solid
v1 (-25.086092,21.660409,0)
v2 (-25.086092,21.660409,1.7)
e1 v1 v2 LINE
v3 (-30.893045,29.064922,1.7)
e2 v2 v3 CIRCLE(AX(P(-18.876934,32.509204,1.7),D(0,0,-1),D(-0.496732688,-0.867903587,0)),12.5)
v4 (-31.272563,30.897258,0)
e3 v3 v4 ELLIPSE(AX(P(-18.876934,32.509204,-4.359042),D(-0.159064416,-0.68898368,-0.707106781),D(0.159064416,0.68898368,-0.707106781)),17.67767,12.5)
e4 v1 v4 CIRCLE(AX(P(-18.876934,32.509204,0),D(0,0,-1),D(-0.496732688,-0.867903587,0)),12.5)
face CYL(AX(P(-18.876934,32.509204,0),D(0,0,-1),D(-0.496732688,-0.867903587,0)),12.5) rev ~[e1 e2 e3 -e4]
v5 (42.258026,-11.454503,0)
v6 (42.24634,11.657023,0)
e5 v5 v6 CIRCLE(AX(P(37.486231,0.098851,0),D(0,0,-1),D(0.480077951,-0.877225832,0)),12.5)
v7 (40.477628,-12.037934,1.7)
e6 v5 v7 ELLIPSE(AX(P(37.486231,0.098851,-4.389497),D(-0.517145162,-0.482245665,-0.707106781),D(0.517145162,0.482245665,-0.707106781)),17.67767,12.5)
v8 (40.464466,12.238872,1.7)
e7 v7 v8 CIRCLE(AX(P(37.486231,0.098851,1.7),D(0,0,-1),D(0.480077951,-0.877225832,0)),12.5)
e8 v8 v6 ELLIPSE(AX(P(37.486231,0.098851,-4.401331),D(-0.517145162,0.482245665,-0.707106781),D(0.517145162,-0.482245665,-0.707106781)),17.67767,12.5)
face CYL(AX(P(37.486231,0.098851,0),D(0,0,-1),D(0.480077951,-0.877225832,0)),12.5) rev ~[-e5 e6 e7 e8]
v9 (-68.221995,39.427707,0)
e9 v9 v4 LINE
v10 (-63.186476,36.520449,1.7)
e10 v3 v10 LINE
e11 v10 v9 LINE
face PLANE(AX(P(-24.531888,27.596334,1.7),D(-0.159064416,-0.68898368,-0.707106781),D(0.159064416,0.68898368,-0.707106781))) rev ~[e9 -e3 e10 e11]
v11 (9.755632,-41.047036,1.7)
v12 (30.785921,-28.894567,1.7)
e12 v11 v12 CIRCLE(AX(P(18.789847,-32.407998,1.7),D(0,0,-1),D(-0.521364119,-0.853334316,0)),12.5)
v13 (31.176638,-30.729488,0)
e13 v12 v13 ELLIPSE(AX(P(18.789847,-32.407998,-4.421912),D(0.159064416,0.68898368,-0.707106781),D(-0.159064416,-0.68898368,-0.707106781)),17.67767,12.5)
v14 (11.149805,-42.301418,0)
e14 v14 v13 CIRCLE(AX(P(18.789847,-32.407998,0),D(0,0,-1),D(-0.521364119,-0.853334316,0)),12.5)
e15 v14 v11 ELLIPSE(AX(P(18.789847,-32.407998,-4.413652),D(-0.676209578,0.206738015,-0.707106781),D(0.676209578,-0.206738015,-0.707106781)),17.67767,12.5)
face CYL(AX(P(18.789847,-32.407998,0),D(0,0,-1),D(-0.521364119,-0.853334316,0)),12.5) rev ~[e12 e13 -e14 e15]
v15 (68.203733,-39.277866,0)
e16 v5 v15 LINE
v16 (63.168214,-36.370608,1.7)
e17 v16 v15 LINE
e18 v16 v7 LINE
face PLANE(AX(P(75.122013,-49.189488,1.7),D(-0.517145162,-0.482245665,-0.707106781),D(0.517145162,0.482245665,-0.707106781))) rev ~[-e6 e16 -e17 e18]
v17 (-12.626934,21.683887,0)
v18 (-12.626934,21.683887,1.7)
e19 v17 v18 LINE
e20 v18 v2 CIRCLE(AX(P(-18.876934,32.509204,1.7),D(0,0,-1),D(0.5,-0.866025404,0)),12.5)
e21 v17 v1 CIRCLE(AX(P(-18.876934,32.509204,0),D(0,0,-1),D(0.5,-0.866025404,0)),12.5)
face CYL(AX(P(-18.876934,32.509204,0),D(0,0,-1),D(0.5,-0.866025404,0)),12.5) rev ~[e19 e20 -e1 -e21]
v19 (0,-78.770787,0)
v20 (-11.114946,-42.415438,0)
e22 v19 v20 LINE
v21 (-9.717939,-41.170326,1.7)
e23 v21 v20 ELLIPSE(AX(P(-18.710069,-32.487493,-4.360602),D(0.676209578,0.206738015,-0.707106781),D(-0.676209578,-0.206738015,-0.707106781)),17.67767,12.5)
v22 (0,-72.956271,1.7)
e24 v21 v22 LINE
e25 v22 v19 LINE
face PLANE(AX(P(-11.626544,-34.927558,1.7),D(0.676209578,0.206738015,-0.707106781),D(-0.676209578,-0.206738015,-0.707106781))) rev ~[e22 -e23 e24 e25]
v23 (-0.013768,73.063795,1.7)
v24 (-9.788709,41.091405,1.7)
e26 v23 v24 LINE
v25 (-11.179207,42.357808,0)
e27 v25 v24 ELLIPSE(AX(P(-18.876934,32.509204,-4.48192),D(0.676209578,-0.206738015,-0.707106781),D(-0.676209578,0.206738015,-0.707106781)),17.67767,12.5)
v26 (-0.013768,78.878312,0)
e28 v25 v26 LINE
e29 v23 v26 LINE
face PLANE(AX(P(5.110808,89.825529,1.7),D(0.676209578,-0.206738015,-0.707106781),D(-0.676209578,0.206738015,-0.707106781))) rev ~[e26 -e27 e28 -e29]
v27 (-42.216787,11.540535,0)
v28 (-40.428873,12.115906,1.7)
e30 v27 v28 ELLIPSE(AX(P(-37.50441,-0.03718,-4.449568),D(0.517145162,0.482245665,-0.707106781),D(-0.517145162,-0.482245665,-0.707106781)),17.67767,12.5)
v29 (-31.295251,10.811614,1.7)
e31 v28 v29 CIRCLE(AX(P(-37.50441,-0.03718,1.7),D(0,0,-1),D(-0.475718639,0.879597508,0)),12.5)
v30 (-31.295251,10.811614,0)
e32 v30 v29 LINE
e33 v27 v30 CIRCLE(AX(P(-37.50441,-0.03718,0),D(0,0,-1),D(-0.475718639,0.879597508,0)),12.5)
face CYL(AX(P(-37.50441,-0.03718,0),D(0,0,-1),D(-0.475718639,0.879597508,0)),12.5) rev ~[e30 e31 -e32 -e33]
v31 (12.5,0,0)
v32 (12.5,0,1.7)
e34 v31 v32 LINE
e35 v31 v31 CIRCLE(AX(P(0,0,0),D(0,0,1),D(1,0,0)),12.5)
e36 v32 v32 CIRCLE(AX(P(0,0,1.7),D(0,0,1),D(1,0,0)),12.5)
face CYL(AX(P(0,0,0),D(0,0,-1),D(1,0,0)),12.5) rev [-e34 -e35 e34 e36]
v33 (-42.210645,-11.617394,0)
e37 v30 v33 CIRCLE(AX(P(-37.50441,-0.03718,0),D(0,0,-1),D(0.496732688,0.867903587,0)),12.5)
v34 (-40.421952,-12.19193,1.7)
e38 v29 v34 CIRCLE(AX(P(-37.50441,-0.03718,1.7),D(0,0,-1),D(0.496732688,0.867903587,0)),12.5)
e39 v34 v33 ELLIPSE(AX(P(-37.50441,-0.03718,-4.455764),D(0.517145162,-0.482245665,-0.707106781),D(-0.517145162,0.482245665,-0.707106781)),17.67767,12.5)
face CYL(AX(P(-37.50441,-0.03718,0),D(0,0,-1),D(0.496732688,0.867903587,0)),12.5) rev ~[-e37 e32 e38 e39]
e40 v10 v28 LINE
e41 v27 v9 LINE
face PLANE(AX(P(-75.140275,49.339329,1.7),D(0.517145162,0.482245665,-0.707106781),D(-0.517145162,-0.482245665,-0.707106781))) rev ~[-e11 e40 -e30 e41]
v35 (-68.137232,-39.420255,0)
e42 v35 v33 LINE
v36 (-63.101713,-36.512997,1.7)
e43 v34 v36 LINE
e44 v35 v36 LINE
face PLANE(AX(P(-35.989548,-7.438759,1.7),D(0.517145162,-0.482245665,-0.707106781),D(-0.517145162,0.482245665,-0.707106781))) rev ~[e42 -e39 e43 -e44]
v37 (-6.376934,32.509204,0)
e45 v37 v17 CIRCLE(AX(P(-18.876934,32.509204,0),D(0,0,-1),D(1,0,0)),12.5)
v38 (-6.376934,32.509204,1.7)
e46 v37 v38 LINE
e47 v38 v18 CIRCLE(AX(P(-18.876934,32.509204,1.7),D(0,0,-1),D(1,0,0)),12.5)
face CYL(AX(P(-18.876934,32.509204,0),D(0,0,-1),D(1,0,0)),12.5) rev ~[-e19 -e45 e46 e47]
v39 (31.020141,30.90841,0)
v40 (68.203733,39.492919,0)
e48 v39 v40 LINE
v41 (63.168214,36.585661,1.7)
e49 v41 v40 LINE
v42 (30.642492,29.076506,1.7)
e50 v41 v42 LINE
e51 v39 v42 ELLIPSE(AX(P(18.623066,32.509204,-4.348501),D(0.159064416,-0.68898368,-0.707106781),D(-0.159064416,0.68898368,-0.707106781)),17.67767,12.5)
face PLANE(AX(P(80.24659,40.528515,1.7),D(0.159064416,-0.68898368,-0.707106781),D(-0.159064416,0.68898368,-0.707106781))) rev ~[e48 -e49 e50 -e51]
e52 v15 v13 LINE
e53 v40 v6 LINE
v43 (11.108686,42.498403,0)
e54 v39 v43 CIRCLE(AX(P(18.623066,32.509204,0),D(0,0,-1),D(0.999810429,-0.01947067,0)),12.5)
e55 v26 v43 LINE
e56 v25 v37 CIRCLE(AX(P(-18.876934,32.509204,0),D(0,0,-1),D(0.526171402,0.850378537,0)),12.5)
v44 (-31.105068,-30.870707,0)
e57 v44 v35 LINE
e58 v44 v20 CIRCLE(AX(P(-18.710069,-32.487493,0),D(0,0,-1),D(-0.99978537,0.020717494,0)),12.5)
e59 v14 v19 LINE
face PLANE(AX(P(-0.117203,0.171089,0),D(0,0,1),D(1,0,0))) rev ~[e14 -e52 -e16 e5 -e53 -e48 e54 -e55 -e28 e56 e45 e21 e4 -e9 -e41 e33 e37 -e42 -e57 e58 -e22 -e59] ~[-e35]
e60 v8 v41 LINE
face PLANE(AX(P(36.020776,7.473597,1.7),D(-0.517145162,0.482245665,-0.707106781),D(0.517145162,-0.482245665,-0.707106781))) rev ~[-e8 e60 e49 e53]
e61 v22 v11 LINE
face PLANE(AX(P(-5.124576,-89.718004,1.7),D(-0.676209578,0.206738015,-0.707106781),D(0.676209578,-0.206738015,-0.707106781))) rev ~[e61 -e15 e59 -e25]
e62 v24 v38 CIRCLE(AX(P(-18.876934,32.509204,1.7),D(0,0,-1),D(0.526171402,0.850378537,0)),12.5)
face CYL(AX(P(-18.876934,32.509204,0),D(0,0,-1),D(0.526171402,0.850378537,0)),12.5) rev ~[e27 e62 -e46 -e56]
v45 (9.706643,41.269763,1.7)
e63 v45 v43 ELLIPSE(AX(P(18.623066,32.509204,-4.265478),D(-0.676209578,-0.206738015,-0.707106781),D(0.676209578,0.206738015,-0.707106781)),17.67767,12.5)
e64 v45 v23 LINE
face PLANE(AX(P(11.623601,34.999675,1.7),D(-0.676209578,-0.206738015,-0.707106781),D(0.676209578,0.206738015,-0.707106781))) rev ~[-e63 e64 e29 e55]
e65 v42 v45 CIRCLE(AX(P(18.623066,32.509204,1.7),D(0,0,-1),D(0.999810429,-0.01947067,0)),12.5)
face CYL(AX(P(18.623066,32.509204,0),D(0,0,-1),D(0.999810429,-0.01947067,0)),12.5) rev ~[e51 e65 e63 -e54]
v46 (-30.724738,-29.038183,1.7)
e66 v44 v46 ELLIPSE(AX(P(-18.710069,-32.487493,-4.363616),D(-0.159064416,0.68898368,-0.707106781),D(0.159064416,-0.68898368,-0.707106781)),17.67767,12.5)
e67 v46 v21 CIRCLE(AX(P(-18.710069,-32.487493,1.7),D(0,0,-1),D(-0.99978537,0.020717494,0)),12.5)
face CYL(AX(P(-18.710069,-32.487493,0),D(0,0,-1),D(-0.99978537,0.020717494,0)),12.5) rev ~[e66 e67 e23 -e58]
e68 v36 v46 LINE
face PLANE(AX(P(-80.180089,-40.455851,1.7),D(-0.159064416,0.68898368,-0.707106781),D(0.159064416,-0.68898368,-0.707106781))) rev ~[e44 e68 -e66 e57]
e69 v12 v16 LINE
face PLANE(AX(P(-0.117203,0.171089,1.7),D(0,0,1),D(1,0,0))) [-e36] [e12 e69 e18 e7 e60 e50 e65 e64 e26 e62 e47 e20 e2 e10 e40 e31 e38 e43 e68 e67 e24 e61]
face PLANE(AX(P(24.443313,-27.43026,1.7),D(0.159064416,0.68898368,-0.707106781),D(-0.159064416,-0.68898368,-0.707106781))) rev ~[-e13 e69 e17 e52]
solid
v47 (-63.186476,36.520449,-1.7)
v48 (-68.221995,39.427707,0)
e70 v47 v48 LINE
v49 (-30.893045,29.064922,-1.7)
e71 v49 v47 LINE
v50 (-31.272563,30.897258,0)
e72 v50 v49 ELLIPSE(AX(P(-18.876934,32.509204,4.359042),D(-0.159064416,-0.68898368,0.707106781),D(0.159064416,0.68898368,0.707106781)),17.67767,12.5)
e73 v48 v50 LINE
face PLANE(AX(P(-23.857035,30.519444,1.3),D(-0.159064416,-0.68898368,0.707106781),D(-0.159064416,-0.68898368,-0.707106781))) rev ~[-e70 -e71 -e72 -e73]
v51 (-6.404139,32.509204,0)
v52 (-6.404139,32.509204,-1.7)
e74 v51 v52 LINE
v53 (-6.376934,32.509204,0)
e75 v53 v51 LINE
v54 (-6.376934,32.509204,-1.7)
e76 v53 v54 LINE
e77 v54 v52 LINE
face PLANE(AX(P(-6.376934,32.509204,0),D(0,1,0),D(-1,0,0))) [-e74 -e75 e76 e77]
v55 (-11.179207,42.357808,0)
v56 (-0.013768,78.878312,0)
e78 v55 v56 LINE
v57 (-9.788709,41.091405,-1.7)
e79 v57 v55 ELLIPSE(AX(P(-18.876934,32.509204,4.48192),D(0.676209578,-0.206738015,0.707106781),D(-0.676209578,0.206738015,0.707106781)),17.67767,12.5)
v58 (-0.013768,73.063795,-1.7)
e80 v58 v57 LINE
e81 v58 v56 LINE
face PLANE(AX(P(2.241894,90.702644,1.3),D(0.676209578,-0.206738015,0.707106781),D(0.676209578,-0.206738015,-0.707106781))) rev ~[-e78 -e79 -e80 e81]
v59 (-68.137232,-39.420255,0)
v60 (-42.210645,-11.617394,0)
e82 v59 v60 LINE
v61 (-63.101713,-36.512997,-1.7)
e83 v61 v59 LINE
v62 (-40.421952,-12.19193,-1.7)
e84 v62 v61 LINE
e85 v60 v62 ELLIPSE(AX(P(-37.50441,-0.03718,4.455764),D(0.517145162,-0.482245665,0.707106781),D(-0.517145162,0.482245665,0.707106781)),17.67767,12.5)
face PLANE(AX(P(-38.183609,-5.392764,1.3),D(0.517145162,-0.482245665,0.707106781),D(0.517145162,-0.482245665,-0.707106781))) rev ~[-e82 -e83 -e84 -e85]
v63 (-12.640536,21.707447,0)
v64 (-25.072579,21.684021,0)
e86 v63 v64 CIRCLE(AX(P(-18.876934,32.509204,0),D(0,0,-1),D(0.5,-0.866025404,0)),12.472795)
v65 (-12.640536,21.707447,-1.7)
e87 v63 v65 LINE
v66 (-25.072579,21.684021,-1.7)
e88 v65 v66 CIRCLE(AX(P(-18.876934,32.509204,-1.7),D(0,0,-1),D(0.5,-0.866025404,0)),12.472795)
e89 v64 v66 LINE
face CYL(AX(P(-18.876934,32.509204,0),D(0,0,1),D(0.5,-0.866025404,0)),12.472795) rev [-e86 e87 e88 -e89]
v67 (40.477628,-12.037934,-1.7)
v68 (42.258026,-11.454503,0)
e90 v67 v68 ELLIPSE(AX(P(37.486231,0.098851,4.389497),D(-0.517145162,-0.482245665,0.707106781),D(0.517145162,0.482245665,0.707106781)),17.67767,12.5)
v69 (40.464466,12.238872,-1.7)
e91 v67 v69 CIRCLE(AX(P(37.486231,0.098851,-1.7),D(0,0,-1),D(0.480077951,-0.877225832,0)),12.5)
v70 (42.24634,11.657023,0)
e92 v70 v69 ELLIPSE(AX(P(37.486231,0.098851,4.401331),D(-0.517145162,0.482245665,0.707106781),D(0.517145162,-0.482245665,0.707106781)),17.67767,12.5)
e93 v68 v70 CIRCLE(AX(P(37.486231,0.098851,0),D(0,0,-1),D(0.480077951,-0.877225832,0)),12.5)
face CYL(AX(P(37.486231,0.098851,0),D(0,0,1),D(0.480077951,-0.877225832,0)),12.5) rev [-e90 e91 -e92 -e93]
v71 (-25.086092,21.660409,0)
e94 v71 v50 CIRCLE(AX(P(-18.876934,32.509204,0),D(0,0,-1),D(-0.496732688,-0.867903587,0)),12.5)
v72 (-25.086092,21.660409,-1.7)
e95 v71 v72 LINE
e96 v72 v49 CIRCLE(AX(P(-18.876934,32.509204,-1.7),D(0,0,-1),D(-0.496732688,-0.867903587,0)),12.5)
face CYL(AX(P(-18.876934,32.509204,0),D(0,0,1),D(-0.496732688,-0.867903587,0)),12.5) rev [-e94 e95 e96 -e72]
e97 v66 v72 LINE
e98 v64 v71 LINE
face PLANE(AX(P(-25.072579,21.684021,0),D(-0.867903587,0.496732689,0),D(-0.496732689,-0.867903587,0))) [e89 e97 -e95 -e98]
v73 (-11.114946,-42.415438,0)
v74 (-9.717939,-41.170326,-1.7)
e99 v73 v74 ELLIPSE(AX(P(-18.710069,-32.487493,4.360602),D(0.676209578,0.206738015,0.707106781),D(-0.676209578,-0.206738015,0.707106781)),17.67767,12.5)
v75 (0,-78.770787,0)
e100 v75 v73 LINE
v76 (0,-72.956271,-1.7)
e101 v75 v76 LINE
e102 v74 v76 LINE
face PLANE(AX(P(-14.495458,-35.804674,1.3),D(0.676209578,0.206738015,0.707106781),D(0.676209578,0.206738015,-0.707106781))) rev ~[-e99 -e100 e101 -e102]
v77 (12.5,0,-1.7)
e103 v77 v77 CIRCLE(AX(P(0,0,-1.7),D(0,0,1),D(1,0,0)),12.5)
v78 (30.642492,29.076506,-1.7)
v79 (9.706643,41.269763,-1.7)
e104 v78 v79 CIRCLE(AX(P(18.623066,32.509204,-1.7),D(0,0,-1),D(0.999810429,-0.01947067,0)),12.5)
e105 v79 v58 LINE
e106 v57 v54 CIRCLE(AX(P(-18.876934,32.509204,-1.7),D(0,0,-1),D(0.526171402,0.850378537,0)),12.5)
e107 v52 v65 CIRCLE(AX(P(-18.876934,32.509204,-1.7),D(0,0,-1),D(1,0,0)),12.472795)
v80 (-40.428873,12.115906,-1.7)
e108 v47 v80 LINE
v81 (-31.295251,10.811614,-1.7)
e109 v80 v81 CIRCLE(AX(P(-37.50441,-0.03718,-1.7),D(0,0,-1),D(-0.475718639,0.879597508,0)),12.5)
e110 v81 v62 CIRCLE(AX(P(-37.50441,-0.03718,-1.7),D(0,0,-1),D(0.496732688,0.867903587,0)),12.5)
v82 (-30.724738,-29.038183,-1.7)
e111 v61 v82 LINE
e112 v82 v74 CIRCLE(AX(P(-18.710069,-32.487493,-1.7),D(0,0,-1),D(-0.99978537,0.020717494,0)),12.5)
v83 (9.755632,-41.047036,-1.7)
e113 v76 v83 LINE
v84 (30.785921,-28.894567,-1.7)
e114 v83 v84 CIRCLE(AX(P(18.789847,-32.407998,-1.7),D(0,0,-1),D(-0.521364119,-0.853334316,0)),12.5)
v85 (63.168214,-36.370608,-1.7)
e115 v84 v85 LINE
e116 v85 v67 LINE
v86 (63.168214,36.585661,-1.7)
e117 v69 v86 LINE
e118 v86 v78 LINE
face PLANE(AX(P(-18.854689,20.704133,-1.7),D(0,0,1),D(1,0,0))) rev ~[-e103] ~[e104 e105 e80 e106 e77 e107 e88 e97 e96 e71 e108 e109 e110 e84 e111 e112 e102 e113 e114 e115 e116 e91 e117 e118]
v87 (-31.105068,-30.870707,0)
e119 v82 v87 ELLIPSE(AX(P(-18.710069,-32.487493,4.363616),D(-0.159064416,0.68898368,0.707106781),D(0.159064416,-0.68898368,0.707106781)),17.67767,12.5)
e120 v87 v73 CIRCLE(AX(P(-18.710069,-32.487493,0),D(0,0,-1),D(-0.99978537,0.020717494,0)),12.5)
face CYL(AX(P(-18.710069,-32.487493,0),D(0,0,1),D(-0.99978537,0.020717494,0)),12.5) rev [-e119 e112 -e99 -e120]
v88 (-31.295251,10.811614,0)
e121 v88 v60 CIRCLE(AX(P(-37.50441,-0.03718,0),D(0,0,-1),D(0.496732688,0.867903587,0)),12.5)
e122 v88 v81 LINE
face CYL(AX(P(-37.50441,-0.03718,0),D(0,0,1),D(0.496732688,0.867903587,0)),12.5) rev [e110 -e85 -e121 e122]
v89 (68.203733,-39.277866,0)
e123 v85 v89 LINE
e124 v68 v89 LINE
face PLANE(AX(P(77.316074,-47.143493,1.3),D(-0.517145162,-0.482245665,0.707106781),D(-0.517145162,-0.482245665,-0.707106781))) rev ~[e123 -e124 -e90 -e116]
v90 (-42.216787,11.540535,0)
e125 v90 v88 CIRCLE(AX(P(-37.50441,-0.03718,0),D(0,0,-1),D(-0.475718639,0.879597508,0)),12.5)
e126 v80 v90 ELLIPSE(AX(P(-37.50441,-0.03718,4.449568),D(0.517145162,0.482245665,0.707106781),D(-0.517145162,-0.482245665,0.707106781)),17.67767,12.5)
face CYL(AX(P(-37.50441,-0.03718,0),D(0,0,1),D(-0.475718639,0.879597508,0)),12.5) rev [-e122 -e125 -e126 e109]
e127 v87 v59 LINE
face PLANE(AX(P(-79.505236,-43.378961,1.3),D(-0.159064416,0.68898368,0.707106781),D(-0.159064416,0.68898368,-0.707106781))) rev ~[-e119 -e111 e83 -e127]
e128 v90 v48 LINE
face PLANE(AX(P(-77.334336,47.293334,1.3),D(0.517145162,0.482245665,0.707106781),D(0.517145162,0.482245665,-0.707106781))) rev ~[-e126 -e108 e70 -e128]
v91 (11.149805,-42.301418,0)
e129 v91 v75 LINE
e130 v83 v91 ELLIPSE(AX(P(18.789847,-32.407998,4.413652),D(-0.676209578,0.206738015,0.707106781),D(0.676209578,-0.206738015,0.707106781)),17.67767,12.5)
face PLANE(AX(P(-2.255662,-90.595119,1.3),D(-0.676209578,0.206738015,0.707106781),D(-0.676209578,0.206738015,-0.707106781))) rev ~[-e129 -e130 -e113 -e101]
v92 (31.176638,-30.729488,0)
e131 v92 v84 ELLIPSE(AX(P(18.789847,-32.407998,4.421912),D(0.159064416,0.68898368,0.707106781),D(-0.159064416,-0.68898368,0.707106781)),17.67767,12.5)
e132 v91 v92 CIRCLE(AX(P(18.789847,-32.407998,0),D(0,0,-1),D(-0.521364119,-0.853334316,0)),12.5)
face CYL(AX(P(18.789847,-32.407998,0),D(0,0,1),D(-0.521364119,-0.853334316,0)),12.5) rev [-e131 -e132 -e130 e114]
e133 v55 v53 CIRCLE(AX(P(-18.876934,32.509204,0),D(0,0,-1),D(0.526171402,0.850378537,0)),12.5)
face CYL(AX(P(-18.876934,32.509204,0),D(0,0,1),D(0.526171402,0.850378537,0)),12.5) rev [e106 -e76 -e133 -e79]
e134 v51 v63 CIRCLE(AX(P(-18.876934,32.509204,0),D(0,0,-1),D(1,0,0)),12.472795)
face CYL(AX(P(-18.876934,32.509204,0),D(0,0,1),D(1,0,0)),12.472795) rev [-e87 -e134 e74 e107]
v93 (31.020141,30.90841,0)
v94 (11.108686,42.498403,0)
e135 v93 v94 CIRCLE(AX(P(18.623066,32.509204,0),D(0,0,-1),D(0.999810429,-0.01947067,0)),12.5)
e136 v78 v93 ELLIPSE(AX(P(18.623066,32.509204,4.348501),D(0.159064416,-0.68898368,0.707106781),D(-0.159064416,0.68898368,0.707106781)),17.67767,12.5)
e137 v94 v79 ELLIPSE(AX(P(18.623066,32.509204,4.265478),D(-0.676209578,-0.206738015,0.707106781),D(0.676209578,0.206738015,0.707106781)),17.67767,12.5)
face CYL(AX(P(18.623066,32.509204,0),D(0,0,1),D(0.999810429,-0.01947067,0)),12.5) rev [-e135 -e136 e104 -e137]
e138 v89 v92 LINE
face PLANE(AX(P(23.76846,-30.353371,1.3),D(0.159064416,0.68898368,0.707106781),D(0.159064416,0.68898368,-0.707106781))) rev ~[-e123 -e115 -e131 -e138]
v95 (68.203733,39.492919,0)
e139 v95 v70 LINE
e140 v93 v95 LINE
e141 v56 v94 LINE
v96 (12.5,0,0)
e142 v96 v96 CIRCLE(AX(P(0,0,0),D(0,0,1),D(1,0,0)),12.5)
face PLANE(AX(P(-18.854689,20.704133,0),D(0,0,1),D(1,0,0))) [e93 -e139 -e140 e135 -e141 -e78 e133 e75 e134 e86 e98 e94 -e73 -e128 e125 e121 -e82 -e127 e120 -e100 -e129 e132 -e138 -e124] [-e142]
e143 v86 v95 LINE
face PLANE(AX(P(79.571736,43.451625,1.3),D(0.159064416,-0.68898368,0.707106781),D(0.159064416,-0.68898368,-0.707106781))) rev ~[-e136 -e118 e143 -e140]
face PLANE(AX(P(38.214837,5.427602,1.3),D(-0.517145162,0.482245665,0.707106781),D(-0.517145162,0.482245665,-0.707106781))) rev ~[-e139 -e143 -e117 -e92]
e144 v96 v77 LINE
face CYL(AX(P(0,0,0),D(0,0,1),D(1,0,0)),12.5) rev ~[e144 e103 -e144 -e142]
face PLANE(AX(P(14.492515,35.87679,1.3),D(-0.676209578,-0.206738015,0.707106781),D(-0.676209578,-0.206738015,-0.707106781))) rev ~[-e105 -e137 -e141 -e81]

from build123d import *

# Parameters (mm, degrees)
F0_R         = 12.5
F1_DEPTH     = 1.7
F2_T1_DEPTH  = 57.3976375262
F2_T3_DEPTH  = 57.1989693925
F2_T5_DEPTH  = 57.4520267978
F2_T7_DEPTH  = 57.3309437412
F2_T9_DEPTH  = 57.4405501522
F2_T11_DEPTH = 57.3333306688
F2_T13_DEPTH = 57.3176158442
F2_T15_DEPTH = 57.2711320889
F2_T17_DEPTH = 57.4067836399
F2_T19_DEPTH = 57.2939176083
F2_T21_DEPTH = 57.2816108198
F2_T23_DEPTH = 57.2833301593
F3_DEPTH     = 1.7
F4_T1_DEPTH  = 57.4067836399
F4_T3_DEPTH  = 57.2939176083
F4_T5_DEPTH  = 57.2711320889
F4_T7_DEPTH  = 57.3176158442
F4_T9_DEPTH  = 57.3333306688
F4_T11_DEPTH = 57.4405501522
F4_T13_DEPTH = 57.3309437412
F4_T15_DEPTH = 57.4520267978
F4_T17_DEPTH = 57.1989693925
F4_T19_DEPTH = 57.3976375262
F4_T21_DEPTH = 57.2816108198
F4_T23_DEPTH = 57.2833301593


# Not quite as in the source:
# - a fillet or chamfer that OpenCascade refuses, or shapes differently, is made with other operations: its cross-section is extruded or revolved along the edge and cut away or added


with BuildPart() as f1:
    # F0 (on Top) → F1 (new body)
    with BuildSketch(Plane.XY):
        with BuildLine():
            ThreePointArc((-12.6269337533, 21.6838866314), (-18.8533795427, 20.0092263707), (-25.0860923523, 21.6604093381))
            ThreePointArc((-25.0860923523, 21.6604093381), (-29.6261220625, 26.129161021), (-31.3743477244, 32.2549522685))
            Line((-31.3743477244, 32.2549522685), (-72.0726857195, 41.6509039433))
            Line((-72.0726857195, 41.6509039433), (-43.4508925376, 10.9577885101))
            ThreePointArc((-43.4508925376, 10.9577885101), (-37.3541054261, 12.4619159711), (-31.2952509513, 10.8116144975))
            ThreePointArc((-31.2952509513, 10.8116144975), (-26.5801816353, -6.1126428325), (-43.4452596611, -11.0351937982))
            Line((-43.4452596611, -11.0351937982), (-71.9879228197, -41.6434526702))
            Line((-71.9879228197, -41.6434526702), (-31.2073862187, -32.228523952))
            ThreePointArc((-31.2073862187, -32.228523952), (-12.4587232405, -21.6629522163), (-12.2397963262, -43.1826116137))
            Line((-12.2397963262, -43.1826116137), (0, -83.217181477))
            Line((0, -83.217181477), (12.2727951603, -43.0746772909))
            ThreePointArc((12.2727951603, -43.0746772909), (12.5361536488, -21.5848137797), (31.2857724927, -32.0888789276))
            Line((31.2857724927, -32.0888789276), (72.0544236589, -41.501063677))
            Line((72.0544236589, -41.501063677), (43.4872051328, -10.8664723972))
            ThreePointArc((43.4872051328, -10.8664723972), (24.9862322359, 0.0927434014), (43.4764876483, 11.0700319481))
            Line((43.4764876483, 11.0700319481), (72.0544236589, 41.716116323))
            Line((72.0544236589, 41.716116323), (31.1206966034, 32.2658208016))
            ThreePointArc((31.1206966034, 32.2658208016), (12.3360655616, 21.7053334655), (12.2368534674, 43.2547281928))
            Line((12.2368534674, 43.2547281928), (-0.0137682524, 83.324706323))
            Line((-0.0137682524, 83.324706323), (-12.2997912318, 43.1389358899))
            ThreePointArc((-12.2997912318, 43.1389358899), (-7.9575866684, 38.5934345524), (-6.3769337533, 32.5092041787))
            ThreePointArc((-6.3769337533, 32.5092041787), (-8.051616206, 26.2592041787), (-12.6269337533, 21.6838866314))
        make_face()
        Circle(F0_R, mode=Mode.SUBTRACT)
    extrude(amount=F1_DEPTH)

    # F2: chamfer of 3 on 12 edges, made by hand

    # F2_s2 → F2_t1 (cut)
    with BuildSketch(Plane(origin=(-59.5589476137, 63.869151823, 0), x_dir=(0, 0, 1), z_dir=(0.6819983601, -0.7313537016, 0))):
        Polygon((1.7, 21.3047773022), (-1.3, 24.3047773022), (1.7, 24.3047773022), align=None)
    extrude(amount=F2_T1_DEPTH, mode=Mode.SUBTRACT)

    # F2_s4 → F2_t3 (cut)
    with BuildSketch(Plane(origin=(-29.3392197818, 6.7734926001, 0), x_dir=(0, 0, 1), z_dir=(-0.9743700648, 0.2249510543, 0))):
        Polygon((1.7, 21.3705673316), (-1.3, 24.3705673316), (1.7, 24.3705673316), align=None)
    extrude(amount=F2_T3_DEPTH, mode=Mode.SUBTRACT)

    # F2_s6 → F2_t5 (cut)
    with BuildSketch(Plane(origin=(25.5517773205, 83.5760977556, 0), x_dir=(0, 0, 1), z_dir=(-0.2923717047, -0.956304756, 0))):
        Polygon((1.7, 21.3749530784), (-1.3, 24.3749530784), (1.7, 24.3749530784), align=None)
    extrude(amount=F2_T5_DEPTH, mode=Mode.SUBTRACT)

    # F2_s8 → F2_t7 (cut)
    with BuildSketch(Plane(origin=(-8.7921854193, 28.757942701, 0), x_dir=(0, 0, 1), z_dir=(-0.2923717047, 0.956304756, 0))):
        Polygon((1.7, 21.348619788), (-1.3, 24.348619788), (1.7, 24.348619788), align=None)
    extrude(amount=F2_T7_DEPTH, mode=Mode.SUBTRACT)

    # F2_s10 → F2_t9 (cut)
    with BuildSketch(Plane(origin=(85.0691389614, 19.6397582326, 0), x_dir=(0, 0, 1), z_dir=(-0.9743700648, -0.2249510543, 0))):
        Polygon((1.7, 21.438216392), (-1.3, 24.438216392), (1.7, 24.438216392), align=None)
    extrude(amount=F2_T9_DEPTH, mode=Mode.SUBTRACT)

    # F2_s12 → F2_t11 (cut)
    with BuildSketch(Plane(origin=(20.4817428017, 21.9639801073, 0), x_dir=(0, 0, 1), z_dir=(0.6819983601, 0.7313537016, 0))):
        Polygon((1.7, 21.2469465406), (-1.3, 24.2469465406), (1.7, 24.2469465406), align=None)
    extrude(amount=F2_T11_DEPTH, mode=Mode.SUBTRACT)

    # F2_s14 → F2_t13 (cut)
    with BuildSketch(Plane(origin=(59.4757159005, -63.779896738, 0), x_dir=(0, 0, 1), z_dir=(-0.6819983601, 0.7313537016, 0))):
        Polygon((1.7, 21.3936120924), (-1.3, 24.3936120924), (1.7, 24.3936120924), align=None)
    extrude(amount=F2_T13_DEPTH, mode=Mode.SUBTRACT)

    # F2_s16 → F2_t15 (cut)
    with BuildSketch(Plane(origin=(29.2187258401, -6.7456743817, 0), x_dir=(0, 0, 1), z_dir=(0.9743700648, -0.2249510543, 0))):
        Polygon((1.7, 21.2286755314), (-1.3, 24.2286755314), (1.7, 24.2286755314), align=None)
    extrude(amount=F2_T15_DEPTH, mode=Mode.SUBTRACT)

    # F2_s18 → F2_t17 (cut)
    with BuildSketch(Plane(origin=(-25.522890682, -83.4816138184, 0), x_dir=(0, 0, 1), z_dir=(0.2923717047, 0.956304756, 0))):
        Polygon((1.7, 21.3303492106), (-1.3, 24.3303492106), (1.7, 24.3303492106), align=None)
    extrude(amount=F2_T17_DEPTH, mode=Mode.SUBTRACT)

    # F2_s20 → F2_t19 (cut)
    with BuildSketch(Plane(origin=(8.7717703206, -28.6911679218, 0), x_dir=(0, 0, 1), z_dir=(0.2923717047, -0.956304756, 0))):
        Polygon((1.7, 21.3303492106), (-1.3, 24.3303492106), (1.7, 24.3303492106), align=None)
    extrude(amount=F2_T19_DEPTH, mode=Mode.SUBTRACT)

    # F2_s22 → F2_t21 (cut)
    with BuildSketch(Plane(origin=(-20.4498413423, -21.9297699805, 0), x_dir=(0, 0, 1), z_dir=(-0.6819983601, -0.7313537016, 0))):
        Polygon((1.7, 21.2478673976), (-1.3, 24.2478673976), (1.7, 24.2478673976), align=None)
    extrude(amount=F2_T21_DEPTH, mode=Mode.SUBTRACT)

    # F2_s24 → F2_t23 (cut)
    with BuildSketch(Plane(origin=(-84.9900764381, -19.6215052109, 0), x_dir=(0, 0, 1), z_dir=(0.9743700648, 0.2249510543, 0))):
        Polygon((1.7, 21.3823745378), (-1.3, 24.3823745378), (1.7, 24.3823745378), align=None)
    extrude(amount=F2_T23_DEPTH, mode=Mode.SUBTRACT)


with BuildPart() as f3:
    # F0 (on Top) → F3 (new body)
    with BuildSketch(Plane.XY):
        with BuildLine():
            ThreePointArc((-12.640536442, 21.7074471794), (-18.8534308068, 20.0364316999), (-25.072578552, 21.6840209828))
            Line((-25.072578552, 21.6840209828), (-25.0860923523, 21.6604093381))
            ThreePointArc((-25.0860923523, 21.6604093381), (-18.8533795427, 20.0092263707), (-12.6269337533, 21.6838866314))
            Line((-12.6269337533, 21.6838866314), (-12.640536442, 21.7074471794))
        make_face()
        with BuildLine():
            ThreePointArc((-6.4041391307, 32.5092041787), (-8.075176754, 26.2728068674), (-12.640536442, 21.7074471794))
            Line((-12.640536442, 21.7074471794), (-12.6269337533, 21.6838866314))
            ThreePointArc((-12.6269337533, 21.6838866314), (-8.051616206, 26.2592041787), (-6.3769337533, 32.5092041787))
            Line((-6.3769337533, 32.5092041787), (-6.4041391307, 32.5092041787))
        make_face()
        with BuildLine():
            ThreePointArc((-12.6269337533, 21.6838866314), (-18.8533795427, 20.0092263707), (-25.0860923523, 21.6604093381))
            ThreePointArc((-25.0860923523, 21.6604093381), (-29.6261220625, 26.129161021), (-31.3743477244, 32.2549522685))
            Line((-31.3743477244, 32.2549522685), (-72.0726857195, 41.6509039433))
            Line((-72.0726857195, 41.6509039433), (-43.4508925376, 10.9577885101))
            ThreePointArc((-43.4508925376, 10.9577885101), (-37.3541054261, 12.4619159711), (-31.2952509513, 10.8116144975))
            ThreePointArc((-31.2952509513, 10.8116144975), (-26.5801816353, -6.1126428325), (-43.4452596611, -11.0351937982))
            Line((-43.4452596611, -11.0351937982), (-71.9879228197, -41.6434526702))
            Line((-71.9879228197, -41.6434526702), (-31.2073862187, -32.228523952))
            ThreePointArc((-31.2073862187, -32.228523952), (-12.4587232405, -21.6629522163), (-12.2397963262, -43.1826116137))
            Line((-12.2397963262, -43.1826116137), (0, -83.217181477))
            Line((0, -83.217181477), (12.2727951603, -43.0746772909))
            ThreePointArc((12.2727951603, -43.0746772909), (12.5361536488, -21.5848137797), (31.2857724927, -32.0888789276))
            Line((31.2857724927, -32.0888789276), (72.0544236589, -41.501063677))
            Line((72.0544236589, -41.501063677), (43.4872051328, -10.8664723972))
            ThreePointArc((43.4872051328, -10.8664723972), (24.9862322359, 0.0927434014), (43.4764876483, 11.0700319481))
            Line((43.4764876483, 11.0700319481), (72.0544236589, 41.716116323))
            Line((72.0544236589, 41.716116323), (31.1206966034, 32.2658208016))
            ThreePointArc((31.1206966034, 32.2658208016), (12.3360655616, 21.7053334655), (12.2368534674, 43.2547281928))
            Line((12.2368534674, 43.2547281928), (-0.0137682524, 83.324706323))
            Line((-0.0137682524, 83.324706323), (-12.2997912318, 43.1389358899))
            ThreePointArc((-12.2997912318, 43.1389358899), (-7.9575866684, 38.5934345524), (-6.3769337533, 32.5092041787))
            ThreePointArc((-6.3769337533, 32.5092041787), (-8.051616206, 26.2592041787), (-12.6269337533, 21.6838866314))
        make_face()
        Circle(F0_R, mode=Mode.SUBTRACT)
    extrude(amount=-F3_DEPTH)

    # F4: chamfer of 3 on 12 edges, made by hand

    # F4_s2 → F4_t1 (cut)
    with BuildSketch(Plane(origin=(-25.522890682, -83.4816138184, 0), x_dir=(0, 0, 1), z_dir=(0.2923717047, 0.956304756, 0))):
        Polygon((1.3, 24.3303492106), (-1.7, 21.3303492106), (-1.7, 24.3303492106), align=None)
    extrude(amount=F4_T1_DEPTH, mode=Mode.SUBTRACT)

    # F4_s4 → F4_t3 (cut)
    with BuildSketch(Plane(origin=(8.7717703206, -28.6911679218, 0), x_dir=(0, 0, 1), z_dir=(0.2923717047, -0.956304756, 0))):
        Polygon((1.3, 24.3303492106), (-1.7, 21.3303492106), (-1.7, 24.3303492106), align=None)
    extrude(amount=F4_T3_DEPTH, mode=Mode.SUBTRACT)

    # F4_s6 → F4_t5 (cut)
    with BuildSketch(Plane(origin=(29.2187258401, -6.7456743817, 0), x_dir=(0, 0, 1), z_dir=(0.9743700648, -0.2249510543, 0))):
        Polygon((1.3, 24.2286755314), (-1.7, 21.2286755314), (-1.7, 24.2286755314), align=None)
    extrude(amount=F4_T5_DEPTH, mode=Mode.SUBTRACT)

    # F4_s8 → F4_t7 (cut)
    with BuildSketch(Plane(origin=(59.4757159005, -63.779896738, 0), x_dir=(0, 0, 1), z_dir=(-0.6819983601, 0.7313537016, 0))):
        Polygon((1.3, 24.3936120924), (-1.7, 21.3936120924), (-1.7, 24.3936120924), align=None)
    extrude(amount=F4_T7_DEPTH, mode=Mode.SUBTRACT)

    # F4_s10 → F4_t9 (cut)
    with BuildSketch(Plane(origin=(20.4817428017, 21.9639801073, 0), x_dir=(0, 0, 1), z_dir=(0.6819983601, 0.7313537016, 0))):
        Polygon((1.3, 24.2469465406), (-1.7, 21.2469465406), (-1.7, 24.2469465406), align=None)
    extrude(amount=F4_T9_DEPTH, mode=Mode.SUBTRACT)

    # F4_s12 → F4_t11 (cut)
    with BuildSketch(Plane(origin=(85.0691389614, 19.6397582326, 0), x_dir=(0, 0, 1), z_dir=(-0.9743700648, -0.2249510543, 0))):
        Polygon((1.3, 24.438216392), (-1.7, 21.438216392), (-1.7, 24.438216392), align=None)
    extrude(amount=F4_T11_DEPTH, mode=Mode.SUBTRACT)

    # F4_s14 → F4_t13 (cut)
    with BuildSketch(Plane(origin=(-8.7921854193, 28.757942701, 0), x_dir=(0, 0, 1), z_dir=(-0.2923717047, 0.956304756, 0))):
        Polygon((1.3, 24.348619788), (-1.7, 21.348619788), (-1.7, 24.348619788), align=None)
    extrude(amount=F4_T13_DEPTH, mode=Mode.SUBTRACT)

    # F4_s16 → F4_t15 (cut)
    with BuildSketch(Plane(origin=(25.5517773205, 83.5760977556, 0), x_dir=(0, 0, 1), z_dir=(-0.2923717047, -0.956304756, 0))):
        Polygon((1.3, 24.3749530784), (-1.7, 21.3749530784), (-1.7, 24.3749530784), align=None)
    extrude(amount=F4_T15_DEPTH, mode=Mode.SUBTRACT)

    # F4_s18 → F4_t17 (cut)
    with BuildSketch(Plane(origin=(-29.3392197818, 6.7734926001, 0), x_dir=(0, 0, 1), z_dir=(-0.9743700648, 0.2249510543, 0))):
        Polygon((1.3, 24.3705673316), (-1.7, 21.3705673316), (-1.7, 24.3705673316), align=None)
    extrude(amount=F4_T17_DEPTH, mode=Mode.SUBTRACT)

    # F4_s20 → F4_t19 (cut)
    with BuildSketch(Plane(origin=(-59.5589476137, 63.869151823, 0), x_dir=(0, 0, 1), z_dir=(0.6819983601, -0.7313537016, 0))):
        Polygon((1.3, 24.3047773022), (-1.7, 21.3047773022), (-1.7, 24.3047773022), align=None)
    extrude(amount=F4_T19_DEPTH, mode=Mode.SUBTRACT)

    # F4_s22 → F4_t21 (cut)
    with BuildSketch(Plane(origin=(-20.4498413423, -21.9297699805, 0), x_dir=(0, 0, 1), z_dir=(-0.6819983601, -0.7313537016, 0))):
        Polygon((1.3, 24.2478673976), (-1.7, 21.2478673976), (-1.7, 24.2478673976), align=None)
    extrude(amount=F4_T21_DEPTH, mode=Mode.SUBTRACT)

    # F4_s24 → F4_t23 (cut)
    with BuildSketch(Plane(origin=(-84.9900764381, -19.6215052109, 0), x_dir=(0, 0, 1), z_dir=(0.9743700648, 0.2249510543, 0))):
        Polygon((1.3, 24.3823745378), (-1.7, 21.3823745378), (-1.7, 24.3823745378), align=None)
    extrude(amount=F4_T23_DEPTH, mode=Mode.SUBTRACT)


solid = Compound([f1.part, f3.part])
